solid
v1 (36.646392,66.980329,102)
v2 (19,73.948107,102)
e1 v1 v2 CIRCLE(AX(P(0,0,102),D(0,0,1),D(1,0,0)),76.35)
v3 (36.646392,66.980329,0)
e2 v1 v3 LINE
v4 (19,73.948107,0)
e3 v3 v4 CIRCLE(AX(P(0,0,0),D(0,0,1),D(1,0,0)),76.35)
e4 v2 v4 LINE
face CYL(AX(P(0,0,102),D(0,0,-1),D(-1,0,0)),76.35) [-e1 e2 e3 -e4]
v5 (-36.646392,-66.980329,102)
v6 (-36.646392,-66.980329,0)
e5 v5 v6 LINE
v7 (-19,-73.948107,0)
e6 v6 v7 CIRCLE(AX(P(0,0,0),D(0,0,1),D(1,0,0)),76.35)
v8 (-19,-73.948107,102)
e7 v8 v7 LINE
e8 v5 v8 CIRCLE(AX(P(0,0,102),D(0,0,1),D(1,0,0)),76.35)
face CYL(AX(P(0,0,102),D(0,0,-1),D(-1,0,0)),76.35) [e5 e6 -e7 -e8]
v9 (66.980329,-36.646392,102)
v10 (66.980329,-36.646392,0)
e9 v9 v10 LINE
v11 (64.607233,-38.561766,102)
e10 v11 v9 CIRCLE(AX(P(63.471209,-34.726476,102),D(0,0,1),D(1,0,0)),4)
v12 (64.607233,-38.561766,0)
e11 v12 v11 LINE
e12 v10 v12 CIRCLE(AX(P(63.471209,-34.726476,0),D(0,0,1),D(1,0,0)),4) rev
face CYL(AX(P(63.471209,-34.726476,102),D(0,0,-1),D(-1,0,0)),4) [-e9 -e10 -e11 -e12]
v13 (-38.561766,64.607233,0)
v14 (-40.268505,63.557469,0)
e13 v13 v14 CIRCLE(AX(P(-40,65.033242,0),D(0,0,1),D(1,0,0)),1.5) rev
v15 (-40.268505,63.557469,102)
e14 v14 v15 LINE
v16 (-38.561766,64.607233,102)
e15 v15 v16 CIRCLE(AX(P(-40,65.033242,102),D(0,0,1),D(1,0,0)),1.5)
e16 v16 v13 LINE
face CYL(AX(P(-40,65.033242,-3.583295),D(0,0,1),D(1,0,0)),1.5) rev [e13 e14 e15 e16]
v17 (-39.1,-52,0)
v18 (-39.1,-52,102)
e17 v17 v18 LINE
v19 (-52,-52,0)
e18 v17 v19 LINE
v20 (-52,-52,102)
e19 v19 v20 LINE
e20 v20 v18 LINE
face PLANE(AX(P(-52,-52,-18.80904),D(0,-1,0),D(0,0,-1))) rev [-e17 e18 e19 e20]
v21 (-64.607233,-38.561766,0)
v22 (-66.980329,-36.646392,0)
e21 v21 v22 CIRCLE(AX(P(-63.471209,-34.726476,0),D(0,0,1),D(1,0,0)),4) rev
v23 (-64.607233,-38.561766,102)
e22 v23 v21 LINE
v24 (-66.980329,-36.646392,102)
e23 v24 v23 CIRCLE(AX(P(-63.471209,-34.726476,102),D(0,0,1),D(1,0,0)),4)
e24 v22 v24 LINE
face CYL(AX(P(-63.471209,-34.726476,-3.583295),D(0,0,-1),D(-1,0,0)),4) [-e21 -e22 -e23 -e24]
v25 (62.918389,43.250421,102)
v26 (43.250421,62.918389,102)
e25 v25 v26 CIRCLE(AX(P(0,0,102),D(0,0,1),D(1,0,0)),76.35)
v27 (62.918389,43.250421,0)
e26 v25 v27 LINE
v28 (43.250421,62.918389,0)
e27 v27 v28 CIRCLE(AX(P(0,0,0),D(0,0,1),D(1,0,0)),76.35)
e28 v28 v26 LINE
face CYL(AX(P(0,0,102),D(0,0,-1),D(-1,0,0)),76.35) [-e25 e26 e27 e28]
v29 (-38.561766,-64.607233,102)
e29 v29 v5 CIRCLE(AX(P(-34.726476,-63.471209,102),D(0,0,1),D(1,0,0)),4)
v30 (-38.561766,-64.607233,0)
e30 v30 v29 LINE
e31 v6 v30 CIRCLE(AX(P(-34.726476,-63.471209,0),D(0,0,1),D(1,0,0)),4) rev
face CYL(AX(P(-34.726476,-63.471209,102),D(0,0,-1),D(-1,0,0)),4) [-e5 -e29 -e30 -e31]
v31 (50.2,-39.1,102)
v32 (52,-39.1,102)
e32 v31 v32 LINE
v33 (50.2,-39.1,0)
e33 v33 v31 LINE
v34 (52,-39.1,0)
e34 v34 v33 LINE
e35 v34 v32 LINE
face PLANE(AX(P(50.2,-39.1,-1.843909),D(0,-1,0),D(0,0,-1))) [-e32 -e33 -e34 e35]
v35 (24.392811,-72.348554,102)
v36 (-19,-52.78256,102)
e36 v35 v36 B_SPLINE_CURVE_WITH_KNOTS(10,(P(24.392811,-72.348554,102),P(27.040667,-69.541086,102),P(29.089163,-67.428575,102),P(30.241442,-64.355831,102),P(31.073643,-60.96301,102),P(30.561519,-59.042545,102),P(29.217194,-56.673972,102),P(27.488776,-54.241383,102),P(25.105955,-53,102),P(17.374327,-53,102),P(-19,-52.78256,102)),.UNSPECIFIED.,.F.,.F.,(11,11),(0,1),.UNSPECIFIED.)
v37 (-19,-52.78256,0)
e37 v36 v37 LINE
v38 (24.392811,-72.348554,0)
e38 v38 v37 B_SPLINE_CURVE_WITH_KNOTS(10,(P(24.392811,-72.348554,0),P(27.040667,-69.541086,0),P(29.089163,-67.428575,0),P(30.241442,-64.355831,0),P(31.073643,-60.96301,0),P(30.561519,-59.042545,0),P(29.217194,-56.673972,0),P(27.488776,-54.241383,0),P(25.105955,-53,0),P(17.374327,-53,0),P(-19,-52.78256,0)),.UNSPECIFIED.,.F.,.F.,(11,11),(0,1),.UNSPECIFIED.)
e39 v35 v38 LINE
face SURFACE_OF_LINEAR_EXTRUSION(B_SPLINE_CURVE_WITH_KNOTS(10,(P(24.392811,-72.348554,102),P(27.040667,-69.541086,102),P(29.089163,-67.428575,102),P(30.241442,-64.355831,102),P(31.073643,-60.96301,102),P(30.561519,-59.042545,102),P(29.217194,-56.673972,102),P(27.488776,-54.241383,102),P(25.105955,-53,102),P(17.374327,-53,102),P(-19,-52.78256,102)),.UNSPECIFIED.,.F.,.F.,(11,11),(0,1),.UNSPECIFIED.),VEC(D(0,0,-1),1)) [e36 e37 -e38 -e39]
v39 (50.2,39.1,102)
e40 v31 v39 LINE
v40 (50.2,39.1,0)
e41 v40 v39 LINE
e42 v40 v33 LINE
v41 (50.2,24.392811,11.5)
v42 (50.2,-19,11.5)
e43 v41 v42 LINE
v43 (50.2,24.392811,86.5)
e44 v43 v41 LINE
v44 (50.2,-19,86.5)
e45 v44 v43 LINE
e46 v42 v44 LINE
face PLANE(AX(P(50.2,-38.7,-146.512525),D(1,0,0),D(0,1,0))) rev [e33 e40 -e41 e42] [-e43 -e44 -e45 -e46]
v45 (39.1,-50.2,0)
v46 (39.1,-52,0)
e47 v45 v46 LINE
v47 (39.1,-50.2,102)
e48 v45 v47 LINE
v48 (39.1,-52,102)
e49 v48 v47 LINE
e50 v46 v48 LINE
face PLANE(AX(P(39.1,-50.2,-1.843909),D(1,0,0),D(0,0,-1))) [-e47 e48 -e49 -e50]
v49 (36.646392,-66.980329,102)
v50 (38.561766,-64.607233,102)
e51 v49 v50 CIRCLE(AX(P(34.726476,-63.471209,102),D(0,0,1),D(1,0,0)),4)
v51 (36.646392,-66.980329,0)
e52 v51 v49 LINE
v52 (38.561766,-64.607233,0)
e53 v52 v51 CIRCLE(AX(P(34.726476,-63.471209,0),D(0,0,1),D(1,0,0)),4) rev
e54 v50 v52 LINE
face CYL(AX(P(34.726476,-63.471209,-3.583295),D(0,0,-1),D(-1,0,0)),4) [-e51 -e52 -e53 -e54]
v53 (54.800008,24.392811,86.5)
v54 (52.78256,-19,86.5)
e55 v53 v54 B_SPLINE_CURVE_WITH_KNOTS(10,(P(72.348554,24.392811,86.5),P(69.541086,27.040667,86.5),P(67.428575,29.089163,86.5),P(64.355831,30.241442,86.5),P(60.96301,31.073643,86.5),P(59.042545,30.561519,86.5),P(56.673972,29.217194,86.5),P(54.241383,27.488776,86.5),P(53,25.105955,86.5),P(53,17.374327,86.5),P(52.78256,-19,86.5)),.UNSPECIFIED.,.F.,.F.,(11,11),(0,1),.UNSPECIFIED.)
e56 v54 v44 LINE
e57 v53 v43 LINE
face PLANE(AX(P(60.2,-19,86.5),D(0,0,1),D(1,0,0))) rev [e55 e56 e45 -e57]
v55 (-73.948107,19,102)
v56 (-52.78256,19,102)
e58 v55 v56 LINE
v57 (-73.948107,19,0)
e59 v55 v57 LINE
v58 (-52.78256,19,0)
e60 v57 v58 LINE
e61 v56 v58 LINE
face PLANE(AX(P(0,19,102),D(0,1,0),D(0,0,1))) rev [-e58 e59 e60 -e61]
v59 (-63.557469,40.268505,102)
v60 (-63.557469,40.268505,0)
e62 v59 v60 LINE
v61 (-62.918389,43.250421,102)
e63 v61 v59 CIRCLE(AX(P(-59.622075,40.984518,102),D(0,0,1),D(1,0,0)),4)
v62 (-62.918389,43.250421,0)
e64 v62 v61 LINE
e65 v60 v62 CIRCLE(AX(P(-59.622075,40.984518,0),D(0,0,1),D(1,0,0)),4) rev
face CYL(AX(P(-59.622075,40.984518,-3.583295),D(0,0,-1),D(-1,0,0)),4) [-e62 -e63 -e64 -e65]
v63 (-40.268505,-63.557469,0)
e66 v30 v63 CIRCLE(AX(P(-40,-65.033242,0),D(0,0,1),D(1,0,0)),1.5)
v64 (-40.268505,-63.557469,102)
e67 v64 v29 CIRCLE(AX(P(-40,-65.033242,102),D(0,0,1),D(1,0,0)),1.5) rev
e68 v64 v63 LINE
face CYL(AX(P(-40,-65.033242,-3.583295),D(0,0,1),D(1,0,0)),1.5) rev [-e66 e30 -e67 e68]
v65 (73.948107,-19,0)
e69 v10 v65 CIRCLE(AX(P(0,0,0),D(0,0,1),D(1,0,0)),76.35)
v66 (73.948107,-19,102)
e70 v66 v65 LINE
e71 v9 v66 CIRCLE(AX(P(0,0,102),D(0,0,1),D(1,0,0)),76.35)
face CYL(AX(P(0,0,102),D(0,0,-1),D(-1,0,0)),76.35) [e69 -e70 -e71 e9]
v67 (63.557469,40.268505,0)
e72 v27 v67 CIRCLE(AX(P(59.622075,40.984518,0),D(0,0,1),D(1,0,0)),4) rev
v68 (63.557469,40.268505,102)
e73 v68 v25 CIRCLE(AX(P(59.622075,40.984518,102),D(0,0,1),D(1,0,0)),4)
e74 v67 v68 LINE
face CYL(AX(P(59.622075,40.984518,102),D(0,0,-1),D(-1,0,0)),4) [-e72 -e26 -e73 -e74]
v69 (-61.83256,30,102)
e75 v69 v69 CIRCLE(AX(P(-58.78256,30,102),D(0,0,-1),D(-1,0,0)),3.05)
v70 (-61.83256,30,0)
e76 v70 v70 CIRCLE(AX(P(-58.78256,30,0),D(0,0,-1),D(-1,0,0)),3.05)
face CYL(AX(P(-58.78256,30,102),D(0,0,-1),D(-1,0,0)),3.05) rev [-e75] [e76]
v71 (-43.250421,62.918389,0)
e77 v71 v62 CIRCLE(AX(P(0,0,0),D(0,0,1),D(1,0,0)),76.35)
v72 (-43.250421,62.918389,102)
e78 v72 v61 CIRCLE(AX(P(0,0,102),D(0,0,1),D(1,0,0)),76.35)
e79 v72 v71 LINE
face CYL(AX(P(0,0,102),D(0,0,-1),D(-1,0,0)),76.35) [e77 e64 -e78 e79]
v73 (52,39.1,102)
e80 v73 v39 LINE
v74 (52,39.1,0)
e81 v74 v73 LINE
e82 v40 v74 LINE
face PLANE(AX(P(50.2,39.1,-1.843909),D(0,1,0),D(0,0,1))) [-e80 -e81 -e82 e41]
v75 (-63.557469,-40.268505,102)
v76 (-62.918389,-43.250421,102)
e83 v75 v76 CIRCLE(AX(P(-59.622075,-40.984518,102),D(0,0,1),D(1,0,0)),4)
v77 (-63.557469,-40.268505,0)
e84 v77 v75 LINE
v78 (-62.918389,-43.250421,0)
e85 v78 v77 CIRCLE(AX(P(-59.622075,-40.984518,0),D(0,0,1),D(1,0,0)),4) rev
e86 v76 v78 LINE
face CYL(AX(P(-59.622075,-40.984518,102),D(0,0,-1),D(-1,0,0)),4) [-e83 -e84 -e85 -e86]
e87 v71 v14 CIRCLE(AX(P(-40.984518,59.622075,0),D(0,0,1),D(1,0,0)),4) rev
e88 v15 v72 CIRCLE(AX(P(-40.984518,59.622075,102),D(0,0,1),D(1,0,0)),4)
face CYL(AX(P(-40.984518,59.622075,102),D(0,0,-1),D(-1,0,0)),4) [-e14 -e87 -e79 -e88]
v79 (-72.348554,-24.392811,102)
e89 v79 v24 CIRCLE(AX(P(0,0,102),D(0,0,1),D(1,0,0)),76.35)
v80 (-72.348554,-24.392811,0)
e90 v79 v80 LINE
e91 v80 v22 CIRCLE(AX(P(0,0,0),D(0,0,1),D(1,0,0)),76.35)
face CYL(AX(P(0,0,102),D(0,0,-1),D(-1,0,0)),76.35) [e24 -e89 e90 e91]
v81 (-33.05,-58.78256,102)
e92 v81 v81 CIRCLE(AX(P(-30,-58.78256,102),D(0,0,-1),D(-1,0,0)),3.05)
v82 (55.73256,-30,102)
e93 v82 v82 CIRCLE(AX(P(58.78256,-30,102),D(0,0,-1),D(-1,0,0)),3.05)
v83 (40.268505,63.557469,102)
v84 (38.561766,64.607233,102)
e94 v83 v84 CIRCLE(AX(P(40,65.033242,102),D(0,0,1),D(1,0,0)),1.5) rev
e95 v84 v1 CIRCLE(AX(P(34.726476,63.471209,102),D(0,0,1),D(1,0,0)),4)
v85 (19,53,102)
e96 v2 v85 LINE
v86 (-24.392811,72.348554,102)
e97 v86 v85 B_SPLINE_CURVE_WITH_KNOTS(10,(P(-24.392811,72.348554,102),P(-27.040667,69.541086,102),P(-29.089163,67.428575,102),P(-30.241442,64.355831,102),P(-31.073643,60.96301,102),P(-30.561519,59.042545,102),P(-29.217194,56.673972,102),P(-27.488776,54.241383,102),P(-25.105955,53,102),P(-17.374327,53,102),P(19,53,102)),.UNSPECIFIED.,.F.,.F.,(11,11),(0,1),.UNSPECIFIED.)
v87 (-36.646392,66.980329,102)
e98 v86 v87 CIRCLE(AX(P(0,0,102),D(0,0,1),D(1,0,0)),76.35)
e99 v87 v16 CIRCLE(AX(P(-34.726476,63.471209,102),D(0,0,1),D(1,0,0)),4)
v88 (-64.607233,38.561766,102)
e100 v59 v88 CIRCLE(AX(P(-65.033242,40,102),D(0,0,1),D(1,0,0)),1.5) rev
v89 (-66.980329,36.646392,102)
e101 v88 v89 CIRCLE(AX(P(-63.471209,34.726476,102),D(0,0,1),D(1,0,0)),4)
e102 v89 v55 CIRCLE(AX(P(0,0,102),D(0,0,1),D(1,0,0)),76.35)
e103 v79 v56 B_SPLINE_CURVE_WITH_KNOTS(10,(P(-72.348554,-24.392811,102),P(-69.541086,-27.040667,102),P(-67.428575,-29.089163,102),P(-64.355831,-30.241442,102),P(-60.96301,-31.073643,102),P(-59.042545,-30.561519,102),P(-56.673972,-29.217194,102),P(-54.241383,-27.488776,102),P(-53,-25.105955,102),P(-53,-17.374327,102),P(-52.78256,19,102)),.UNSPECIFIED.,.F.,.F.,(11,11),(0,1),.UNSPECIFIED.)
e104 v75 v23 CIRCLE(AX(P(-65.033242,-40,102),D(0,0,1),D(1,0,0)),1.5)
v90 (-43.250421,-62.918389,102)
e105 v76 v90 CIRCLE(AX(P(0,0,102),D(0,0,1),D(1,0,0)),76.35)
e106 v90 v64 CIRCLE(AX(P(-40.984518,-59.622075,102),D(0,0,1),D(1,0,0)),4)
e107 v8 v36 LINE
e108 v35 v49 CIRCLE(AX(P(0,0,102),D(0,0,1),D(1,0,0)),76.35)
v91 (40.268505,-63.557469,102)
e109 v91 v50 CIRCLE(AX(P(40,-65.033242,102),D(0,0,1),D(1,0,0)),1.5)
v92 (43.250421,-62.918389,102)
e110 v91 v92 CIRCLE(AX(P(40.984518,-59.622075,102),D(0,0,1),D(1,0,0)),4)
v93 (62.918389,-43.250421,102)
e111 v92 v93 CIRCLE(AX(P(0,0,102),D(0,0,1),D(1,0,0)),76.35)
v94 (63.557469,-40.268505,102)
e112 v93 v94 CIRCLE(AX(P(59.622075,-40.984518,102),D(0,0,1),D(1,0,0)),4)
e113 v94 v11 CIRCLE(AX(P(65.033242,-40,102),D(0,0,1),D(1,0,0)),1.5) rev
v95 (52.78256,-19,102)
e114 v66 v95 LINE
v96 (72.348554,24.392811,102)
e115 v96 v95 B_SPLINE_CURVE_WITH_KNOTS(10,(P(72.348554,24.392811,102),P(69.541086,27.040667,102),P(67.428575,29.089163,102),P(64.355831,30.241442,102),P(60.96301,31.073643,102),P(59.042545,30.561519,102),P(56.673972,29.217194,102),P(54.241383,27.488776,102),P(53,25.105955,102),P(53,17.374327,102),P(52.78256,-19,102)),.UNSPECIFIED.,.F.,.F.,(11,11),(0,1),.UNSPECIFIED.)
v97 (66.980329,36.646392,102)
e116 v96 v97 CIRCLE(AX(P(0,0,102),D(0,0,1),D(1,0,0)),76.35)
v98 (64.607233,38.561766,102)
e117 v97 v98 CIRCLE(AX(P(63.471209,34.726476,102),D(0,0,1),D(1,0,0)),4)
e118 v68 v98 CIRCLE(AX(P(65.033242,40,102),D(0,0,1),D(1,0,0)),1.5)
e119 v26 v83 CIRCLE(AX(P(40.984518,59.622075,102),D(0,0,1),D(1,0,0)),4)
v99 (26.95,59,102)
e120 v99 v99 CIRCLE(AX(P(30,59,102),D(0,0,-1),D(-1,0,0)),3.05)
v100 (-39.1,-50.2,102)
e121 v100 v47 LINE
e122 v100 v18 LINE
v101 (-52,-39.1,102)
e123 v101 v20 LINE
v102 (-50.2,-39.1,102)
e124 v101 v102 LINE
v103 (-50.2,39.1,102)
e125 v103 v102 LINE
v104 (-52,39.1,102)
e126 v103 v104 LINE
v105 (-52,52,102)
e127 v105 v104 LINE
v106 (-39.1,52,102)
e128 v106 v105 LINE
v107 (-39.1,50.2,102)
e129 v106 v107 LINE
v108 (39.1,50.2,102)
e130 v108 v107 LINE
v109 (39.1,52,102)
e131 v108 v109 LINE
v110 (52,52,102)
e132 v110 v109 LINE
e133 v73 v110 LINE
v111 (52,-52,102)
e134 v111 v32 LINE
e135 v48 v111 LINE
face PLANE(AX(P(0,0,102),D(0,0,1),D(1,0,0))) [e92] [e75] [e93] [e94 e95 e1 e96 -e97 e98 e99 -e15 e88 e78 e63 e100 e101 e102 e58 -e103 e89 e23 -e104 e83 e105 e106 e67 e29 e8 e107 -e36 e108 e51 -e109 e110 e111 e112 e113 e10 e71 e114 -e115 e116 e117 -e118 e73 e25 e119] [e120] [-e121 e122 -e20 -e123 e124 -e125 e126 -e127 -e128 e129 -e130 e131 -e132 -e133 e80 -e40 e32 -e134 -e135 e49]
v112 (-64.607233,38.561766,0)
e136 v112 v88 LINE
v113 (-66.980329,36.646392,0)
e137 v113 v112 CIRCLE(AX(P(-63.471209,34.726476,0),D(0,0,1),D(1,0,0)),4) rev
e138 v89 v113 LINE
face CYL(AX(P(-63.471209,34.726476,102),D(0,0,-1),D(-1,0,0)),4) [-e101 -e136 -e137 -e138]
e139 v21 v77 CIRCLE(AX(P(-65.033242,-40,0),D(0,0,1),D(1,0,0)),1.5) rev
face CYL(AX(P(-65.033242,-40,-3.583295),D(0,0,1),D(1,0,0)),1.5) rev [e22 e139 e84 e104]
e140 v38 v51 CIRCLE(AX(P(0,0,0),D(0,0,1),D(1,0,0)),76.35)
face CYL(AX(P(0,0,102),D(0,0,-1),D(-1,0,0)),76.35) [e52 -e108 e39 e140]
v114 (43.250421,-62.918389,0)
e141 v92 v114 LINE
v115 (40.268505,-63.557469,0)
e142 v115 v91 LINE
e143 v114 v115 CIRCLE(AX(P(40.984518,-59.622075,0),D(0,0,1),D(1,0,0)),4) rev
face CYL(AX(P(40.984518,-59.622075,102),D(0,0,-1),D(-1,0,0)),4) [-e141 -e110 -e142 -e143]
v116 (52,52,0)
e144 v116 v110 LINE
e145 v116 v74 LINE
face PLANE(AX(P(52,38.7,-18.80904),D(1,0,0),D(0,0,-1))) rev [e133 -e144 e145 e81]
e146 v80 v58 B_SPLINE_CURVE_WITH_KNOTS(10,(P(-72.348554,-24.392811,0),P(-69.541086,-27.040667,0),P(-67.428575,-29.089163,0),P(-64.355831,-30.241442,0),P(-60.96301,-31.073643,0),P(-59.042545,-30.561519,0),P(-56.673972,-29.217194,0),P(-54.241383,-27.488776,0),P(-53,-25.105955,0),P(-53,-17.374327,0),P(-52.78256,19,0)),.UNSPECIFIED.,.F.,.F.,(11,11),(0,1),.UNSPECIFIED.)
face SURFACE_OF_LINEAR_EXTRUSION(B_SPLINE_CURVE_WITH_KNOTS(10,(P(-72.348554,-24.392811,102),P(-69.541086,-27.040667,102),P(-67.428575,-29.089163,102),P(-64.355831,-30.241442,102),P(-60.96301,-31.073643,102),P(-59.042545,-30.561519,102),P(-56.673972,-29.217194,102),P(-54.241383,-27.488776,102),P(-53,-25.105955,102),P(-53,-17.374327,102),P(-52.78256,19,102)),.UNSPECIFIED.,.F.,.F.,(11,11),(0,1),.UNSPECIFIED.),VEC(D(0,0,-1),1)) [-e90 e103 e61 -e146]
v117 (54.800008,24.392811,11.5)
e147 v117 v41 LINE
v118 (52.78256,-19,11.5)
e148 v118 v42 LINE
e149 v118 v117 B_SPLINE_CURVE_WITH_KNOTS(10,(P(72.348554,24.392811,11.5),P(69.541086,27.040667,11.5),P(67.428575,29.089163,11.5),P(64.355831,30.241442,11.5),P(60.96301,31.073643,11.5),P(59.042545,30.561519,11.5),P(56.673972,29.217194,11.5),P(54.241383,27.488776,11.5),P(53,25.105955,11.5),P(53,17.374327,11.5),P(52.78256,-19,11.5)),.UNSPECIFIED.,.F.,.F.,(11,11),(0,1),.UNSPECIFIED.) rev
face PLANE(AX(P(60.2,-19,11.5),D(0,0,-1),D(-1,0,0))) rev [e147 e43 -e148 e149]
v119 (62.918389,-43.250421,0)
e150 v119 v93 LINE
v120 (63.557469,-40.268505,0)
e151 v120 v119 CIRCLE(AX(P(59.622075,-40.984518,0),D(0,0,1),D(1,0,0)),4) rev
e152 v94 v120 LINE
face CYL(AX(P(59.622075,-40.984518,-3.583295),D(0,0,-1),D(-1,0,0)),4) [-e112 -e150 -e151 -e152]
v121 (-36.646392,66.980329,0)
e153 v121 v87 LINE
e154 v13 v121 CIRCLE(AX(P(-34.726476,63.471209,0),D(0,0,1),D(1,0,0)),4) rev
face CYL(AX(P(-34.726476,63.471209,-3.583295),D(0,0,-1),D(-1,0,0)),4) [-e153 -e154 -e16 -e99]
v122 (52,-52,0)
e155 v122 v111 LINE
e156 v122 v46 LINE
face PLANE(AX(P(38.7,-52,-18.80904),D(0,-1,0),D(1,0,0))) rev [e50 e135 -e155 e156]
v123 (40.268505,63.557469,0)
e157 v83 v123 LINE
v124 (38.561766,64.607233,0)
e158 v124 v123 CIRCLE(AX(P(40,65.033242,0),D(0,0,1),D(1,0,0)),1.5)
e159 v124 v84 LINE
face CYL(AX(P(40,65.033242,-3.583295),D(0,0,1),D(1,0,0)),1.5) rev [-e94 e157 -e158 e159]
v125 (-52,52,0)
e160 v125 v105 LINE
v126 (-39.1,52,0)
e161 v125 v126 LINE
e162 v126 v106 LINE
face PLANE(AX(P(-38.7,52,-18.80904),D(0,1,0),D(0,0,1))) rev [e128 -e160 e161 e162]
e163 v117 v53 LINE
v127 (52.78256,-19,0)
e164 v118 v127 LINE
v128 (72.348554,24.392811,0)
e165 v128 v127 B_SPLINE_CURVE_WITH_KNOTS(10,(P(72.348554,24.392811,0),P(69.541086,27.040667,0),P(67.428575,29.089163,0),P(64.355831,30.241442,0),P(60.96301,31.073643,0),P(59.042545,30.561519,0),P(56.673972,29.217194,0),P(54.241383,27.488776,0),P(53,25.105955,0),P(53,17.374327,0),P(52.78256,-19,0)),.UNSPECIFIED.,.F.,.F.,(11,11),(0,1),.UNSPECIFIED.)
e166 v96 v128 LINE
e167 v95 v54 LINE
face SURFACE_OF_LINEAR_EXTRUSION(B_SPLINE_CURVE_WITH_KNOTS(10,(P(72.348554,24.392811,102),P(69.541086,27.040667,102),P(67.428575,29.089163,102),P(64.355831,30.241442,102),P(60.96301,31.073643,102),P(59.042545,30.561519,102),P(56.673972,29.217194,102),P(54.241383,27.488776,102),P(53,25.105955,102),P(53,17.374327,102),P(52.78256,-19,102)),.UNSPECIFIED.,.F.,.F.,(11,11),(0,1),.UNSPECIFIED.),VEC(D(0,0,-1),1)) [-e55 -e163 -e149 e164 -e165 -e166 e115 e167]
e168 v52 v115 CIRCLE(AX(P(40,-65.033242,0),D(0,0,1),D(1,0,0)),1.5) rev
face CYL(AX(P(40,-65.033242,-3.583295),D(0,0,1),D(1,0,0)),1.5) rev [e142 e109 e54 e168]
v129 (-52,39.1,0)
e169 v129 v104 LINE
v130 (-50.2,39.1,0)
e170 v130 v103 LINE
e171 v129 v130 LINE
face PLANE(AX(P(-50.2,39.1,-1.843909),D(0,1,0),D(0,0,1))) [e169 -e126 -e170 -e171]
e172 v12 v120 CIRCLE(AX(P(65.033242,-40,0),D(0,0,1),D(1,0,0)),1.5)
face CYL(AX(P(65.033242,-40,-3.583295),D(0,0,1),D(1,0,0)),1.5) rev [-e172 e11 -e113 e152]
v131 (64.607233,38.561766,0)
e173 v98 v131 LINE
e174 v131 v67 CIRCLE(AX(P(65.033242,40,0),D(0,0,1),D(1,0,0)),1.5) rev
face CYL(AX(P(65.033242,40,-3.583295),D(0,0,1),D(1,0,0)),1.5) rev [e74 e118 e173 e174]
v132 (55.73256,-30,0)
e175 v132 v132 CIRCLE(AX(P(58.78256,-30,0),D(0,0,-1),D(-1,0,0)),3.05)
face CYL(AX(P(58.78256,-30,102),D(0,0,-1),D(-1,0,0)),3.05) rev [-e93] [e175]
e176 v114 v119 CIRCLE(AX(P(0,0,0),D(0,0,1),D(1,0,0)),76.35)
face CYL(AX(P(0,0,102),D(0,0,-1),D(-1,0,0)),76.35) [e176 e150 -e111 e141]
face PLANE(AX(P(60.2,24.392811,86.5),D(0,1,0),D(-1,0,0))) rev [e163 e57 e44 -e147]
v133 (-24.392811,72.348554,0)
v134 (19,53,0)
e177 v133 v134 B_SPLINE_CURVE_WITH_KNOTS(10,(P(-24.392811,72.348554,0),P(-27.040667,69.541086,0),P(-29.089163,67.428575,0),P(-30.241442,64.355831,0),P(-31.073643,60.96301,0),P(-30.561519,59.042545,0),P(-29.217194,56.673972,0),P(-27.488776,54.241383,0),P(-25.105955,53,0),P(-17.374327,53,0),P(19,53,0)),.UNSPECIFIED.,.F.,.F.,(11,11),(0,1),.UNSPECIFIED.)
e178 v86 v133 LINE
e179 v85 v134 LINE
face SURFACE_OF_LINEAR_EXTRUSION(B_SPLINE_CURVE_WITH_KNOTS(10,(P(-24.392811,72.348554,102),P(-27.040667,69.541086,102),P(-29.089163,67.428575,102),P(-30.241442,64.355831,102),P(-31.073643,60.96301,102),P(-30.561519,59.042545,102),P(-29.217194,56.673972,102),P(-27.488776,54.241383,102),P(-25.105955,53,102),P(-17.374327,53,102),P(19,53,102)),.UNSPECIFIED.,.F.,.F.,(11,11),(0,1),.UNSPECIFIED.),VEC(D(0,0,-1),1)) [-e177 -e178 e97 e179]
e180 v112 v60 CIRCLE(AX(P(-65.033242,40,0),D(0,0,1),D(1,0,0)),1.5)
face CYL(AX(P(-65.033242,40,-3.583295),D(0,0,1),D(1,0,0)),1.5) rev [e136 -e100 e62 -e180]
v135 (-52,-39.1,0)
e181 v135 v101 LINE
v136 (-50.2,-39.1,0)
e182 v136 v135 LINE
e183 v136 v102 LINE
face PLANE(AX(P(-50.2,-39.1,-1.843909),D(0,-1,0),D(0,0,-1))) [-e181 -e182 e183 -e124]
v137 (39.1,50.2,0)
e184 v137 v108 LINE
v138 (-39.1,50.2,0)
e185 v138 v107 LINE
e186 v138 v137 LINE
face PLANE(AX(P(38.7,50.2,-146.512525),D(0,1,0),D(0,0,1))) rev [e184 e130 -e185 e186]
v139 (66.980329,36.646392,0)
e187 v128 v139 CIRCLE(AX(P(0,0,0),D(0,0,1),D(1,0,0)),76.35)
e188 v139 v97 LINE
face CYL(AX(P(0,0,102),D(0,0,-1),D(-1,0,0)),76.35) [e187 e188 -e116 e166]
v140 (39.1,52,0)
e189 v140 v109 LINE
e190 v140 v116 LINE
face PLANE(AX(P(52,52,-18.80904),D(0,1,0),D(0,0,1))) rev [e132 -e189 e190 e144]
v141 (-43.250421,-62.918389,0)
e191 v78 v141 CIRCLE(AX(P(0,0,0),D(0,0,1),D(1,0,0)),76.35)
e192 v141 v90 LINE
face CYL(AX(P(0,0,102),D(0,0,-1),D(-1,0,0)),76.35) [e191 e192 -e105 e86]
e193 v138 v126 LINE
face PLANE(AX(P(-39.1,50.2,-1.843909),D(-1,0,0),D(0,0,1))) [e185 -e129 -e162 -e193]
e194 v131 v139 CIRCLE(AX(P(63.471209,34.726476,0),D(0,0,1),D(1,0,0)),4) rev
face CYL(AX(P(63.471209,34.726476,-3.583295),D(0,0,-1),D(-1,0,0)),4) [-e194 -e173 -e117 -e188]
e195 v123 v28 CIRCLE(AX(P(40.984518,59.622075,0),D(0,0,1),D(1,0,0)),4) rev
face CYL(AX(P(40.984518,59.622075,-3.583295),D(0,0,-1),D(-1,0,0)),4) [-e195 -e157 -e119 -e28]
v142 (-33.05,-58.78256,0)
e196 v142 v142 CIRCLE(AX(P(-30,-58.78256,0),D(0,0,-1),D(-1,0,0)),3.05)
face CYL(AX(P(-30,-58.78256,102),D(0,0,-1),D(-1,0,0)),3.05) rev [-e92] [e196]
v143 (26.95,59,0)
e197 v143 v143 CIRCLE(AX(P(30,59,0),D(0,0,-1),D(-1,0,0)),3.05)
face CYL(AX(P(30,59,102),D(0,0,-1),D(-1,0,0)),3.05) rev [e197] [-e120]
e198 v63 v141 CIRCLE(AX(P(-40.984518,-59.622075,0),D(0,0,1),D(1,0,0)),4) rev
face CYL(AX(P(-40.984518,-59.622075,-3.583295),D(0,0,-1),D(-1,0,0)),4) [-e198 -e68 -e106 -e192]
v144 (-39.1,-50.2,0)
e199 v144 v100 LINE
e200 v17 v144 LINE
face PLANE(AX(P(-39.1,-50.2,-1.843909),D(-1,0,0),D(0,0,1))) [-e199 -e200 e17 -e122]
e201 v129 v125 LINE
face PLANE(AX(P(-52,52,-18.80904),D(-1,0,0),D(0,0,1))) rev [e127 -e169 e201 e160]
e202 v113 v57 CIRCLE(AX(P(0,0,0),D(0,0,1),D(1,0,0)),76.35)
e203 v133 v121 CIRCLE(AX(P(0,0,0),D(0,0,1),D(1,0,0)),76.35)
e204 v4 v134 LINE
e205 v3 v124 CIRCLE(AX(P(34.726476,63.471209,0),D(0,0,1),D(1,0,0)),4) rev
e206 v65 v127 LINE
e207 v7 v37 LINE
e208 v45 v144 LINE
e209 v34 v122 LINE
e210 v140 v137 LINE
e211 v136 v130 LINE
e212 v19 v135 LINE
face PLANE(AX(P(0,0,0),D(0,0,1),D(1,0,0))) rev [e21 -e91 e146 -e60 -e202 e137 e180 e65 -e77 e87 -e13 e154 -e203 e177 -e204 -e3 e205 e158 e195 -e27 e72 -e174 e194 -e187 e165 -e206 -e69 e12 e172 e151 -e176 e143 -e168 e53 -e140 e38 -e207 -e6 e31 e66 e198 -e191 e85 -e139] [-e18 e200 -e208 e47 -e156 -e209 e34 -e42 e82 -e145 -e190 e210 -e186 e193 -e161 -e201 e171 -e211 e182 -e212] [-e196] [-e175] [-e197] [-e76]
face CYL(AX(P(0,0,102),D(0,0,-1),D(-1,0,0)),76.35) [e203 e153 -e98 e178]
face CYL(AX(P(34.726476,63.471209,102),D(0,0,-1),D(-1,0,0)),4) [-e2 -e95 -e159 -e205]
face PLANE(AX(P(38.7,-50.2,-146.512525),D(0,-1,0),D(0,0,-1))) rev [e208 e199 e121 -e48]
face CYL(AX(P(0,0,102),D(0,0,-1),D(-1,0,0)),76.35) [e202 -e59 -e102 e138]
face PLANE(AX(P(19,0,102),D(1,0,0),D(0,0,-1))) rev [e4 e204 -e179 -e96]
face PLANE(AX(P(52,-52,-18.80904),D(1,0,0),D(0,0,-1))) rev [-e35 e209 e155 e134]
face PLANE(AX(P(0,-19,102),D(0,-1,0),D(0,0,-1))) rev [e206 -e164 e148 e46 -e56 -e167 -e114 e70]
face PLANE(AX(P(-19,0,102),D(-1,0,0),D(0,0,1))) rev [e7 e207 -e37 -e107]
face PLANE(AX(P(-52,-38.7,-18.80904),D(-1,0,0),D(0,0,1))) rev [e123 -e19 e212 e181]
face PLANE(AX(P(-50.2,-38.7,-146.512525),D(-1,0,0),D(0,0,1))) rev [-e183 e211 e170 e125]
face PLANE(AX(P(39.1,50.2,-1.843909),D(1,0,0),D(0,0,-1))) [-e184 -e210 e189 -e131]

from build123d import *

# Parameters (mm, degrees)
BOSS_EXTRUDE3_OUTLINE_R = 3
BOSS_EXTRUDE3_DEPTH     = 102
CUT_EXTRUDE1_DEPTH      = 102
CUT_EXTRUDE2_DEPTH      = 102
SKETCH4_W               = 0.4
SKETCH4_H               = 1.8
SKETCH4_W_2             = 1.8
SKETCH4_H_2             = 0.4
BOSS_EXTRUDE4_DEPTH     = 102
SKETCH5_W               = 75
SKETCH5_H               = 43.392810524
CUT_EXTRUDE6_DEPTH      = 10
SKETCH7_R               = 3.05
CUT_EXTRUDE9_DEPTH      = 147.084376475
CUT_EXTRUDE8_START      = -102
CUT_EXTRUDE8_DEPTH      = 102
FILLET1_R               = 4


# Read off the part's stored shape, not the designer's step: Boss-Extrude3
with BuildPart() as part:
    # Boss-Extrude3 outline → Boss-Extrude3 (new body)
    with BuildSketch(Plane.XY):
        with BuildLine():
            add(Edge.make_bspline(
                [(24.392810524, -72.348554199), (27.040667073, -69.541086329), (29.089162938, -67.428574969), (30.241441862, -64.355831171), (31.073643307, -60.963009895), (30.561519341, -59.042545022), (29.217193929, -56.673971678), (27.488775543, -54.241382838), (25.105954954, -53), (17.37432721, -53), (-19, -52.782560411)],
                knots=[0, 0, 0, 0, 0, 0, 0, 0, 0, 0, 0, 1, 1, 1, 1, 1, 1, 1, 1, 1, 1, 1], degree=10))
            ThreePointArc((24.392810524, -72.348554199), (55.939709188, -51.962211615), (73.948106805, -19))
            Line((73.948106805, -19), (52.782560411, -19))
            add(Edge.make_bspline(
                [(72.348554199, 24.392810524), (69.541086329, 27.040667073), (67.428574969, 29.089162938), (64.355831171, 30.241441862), (60.963009895, 31.073643307), (59.042545022, 30.561519341), (56.673971678, 29.217193929), (54.241382838, 27.488775543), (53, 25.105954954), (53, 17.37432721), (52.782560411, -19)],
                knots=[0, 0, 0, 0, 0, 0, 0, 0, 0, 0, 0, 1, 1, 1, 1, 1, 1, 1, 1, 1, 1, 1], degree=10))
            ThreePointArc((72.348554199, 24.392810524), (51.962211615, 55.939709188), (19, 73.948106805))
            Line((19, 73.948106805), (19, 53))
            add(Edge.make_bspline(
                [(-24.392810524, 72.348554199), (-27.040667073, 69.541086329), (-29.089162938, 67.428574969), (-30.241441862, 64.355831171), (-31.073643307, 60.963009895), (-30.561519341, 59.042545022), (-29.217193929, 56.673971678), (-27.488775543, 54.241382838), (-25.105954954, 53), (-17.37432721, 53), (19, 53)],
                knots=[0, 0, 0, 0, 0, 0, 0, 0, 0, 0, 0, 1, 1, 1, 1, 1, 1, 1, 1, 1, 1, 1], degree=10))
            ThreePointArc((-24.392810524, 72.348554199), (-55.939709188, 51.962211615), (-73.948106805, 19))
            Line((-73.948106805, 19), (-52.782560411, 19))
            add(Edge.make_bspline(
                [(-72.348554199, -24.392810524), (-69.541086329, -27.040667073), (-67.428574969, -29.089162938), (-64.355831171, -30.241441862), (-60.963009895, -31.073643307), (-59.042545022, -30.561519341), (-56.673971678, -29.217193929), (-54.241382838, -27.488775543), (-53, -25.105954954), (-53, -17.37432721), (-52.782560411, 19)],
                knots=[0, 0, 0, 0, 0, 0, 0, 0, 0, 0, 0, 1, 1, 1, 1, 1, 1, 1, 1, 1, 1, 1], degree=10))
            ThreePointArc((-72.348554199, -24.392810524), (-51.962211615, -55.939709188), (-19, -73.948106805))
            Line((-19, -73.948106805), (-19, -52.782560411))
        make_face()
        with Locations((-30, -58.782560411)):
            Circle(BOSS_EXTRUDE3_OUTLINE_R, mode=Mode.SUBTRACT)
        with Locations((58.782560411, -30)):
            Circle(BOSS_EXTRUDE3_OUTLINE_R, mode=Mode.SUBTRACT)
        with Locations((-58.782560411, 30)):
            Circle(BOSS_EXTRUDE3_OUTLINE_R, mode=Mode.SUBTRACT)
        Polygon((-38.9, -51.6), (-51.6, -51.6), (-51.6, -38.9), (-50, -38.9), (-50, 38.9), (-51.6, 38.9), (-51.6, 51.6), (-38.9, 51.6), (-38.9, 50), (38.9, 50), (38.9, 51.6), (51.6, 51.6), (51.6, 38.9), (50, 38.9), (50, -38.9), (51.6, -38.9), (51.6, -51.6), (38.9, -51.6), (38.9, -50), (-38.9, -50), align=None, mode=Mode.SUBTRACT)
        with Locations((30, 59)):
            Circle(BOSS_EXTRUDE3_OUTLINE_R, mode=Mode.SUBTRACT)
    extrude(amount=BOSS_EXTRUDE3_DEPTH)

    # Sketch2 → Cut-Extrude1 (cut)
    with BuildSketch(Plane.XY.offset(102)):
        Polygon((51.8, -38.7), (50.2, -38.7), (50.2, 38.7), (51.8, 38.7), (51.8, 51.8), (38.7, 51.8), (38.7, 50.2), (-38.7, 50.2), (-38.7, 51.8), (-51.8, 51.8), (-51.8, 38.7), (-50.2, 38.7), (-50.2, -38.7), (-51.8, -38.7), (-51.8, -51.8), (-38.7, -51.8), (-38.7, -50.2), (38.7, -50.2), (38.7, -51.8), (51.8, -51.8), align=None)
        Polygon((51.6, -38.9), (50, -38.9), (50, 38.9), (51.6, 38.9), (51.6, 51.6), (38.9, 51.6), (38.9, 50), (-38.9, 50), (-38.9, 51.6), (-51.6, 51.6), (-51.6, 38.9), (-50, 38.9), (-50, -38.9), (-51.6, -38.9), (-51.6, -51.6), (-38.9, -51.6), (-38.9, -50), (38.9, -50), (38.9, -51.6), (51.6, -51.6), align=None, mode=Mode.SUBTRACT)
    extrude(amount=-CUT_EXTRUDE1_DEPTH, mode=Mode.SUBTRACT)

    # Sketch3 → Cut-Extrude2 (cut)
    with BuildSketch(Plane.XY.offset(102)):
        Polygon((-51.8, -51.8), (-38.7, -51.8), (-38.7, -52), (-52, -52), (-52, -38.7), (-51.8, -38.7), align=None)
        Polygon((38.7, -51.8), (51.8, -51.8), (51.8, -38.7), (52, -38.7), (52, -52), (38.7, -52), align=None)
        Polygon((51.8, 38.7), (51.8, 51.8), (38.7, 51.8), (38.7, 52), (52, 52), (52, 38.7), align=None)
        Polygon((-51.8, 51.8), (-51.8, 38.7), (-52, 38.7), (-52, 52), (-38.7, 52), (-38.7, 51.8), align=None)
    extrude(amount=-CUT_EXTRUDE2_DEPTH, mode=Mode.SUBTRACT)

    # Sketch4 → Boss-Extrude4 (add)
    with BuildSketch(Plane.XY.offset(102)):
        with Locations((-38.9, 51.1)):
            Rectangle(SKETCH4_W, SKETCH4_H)
        with Locations((-51.1, 38.9)):
            Rectangle(SKETCH4_W_2, SKETCH4_H_2)
        with Locations((38.9, 51.1)):
            Rectangle(SKETCH4_W, SKETCH4_H)
        with Locations((51.1, 38.9)):
            Rectangle(SKETCH4_W_2, SKETCH4_H_2)
        with Locations((38.9, -51.1)):
            Rectangle(SKETCH4_W, SKETCH4_H)
        with Locations((51.1, -38.9)):
            Rectangle(SKETCH4_W_2, SKETCH4_H_2)
        with Locations((-51.1, -38.9)):
            Rectangle(SKETCH4_W_2, SKETCH4_H_2)
        with Locations((-38.9, -51.1)):
            Rectangle(SKETCH4_W, SKETCH4_H)
    extrude(amount=-BOSS_EXTRUDE4_DEPTH)

    # Sketch5 → Cut-Extrude6 (cut)
    with BuildSketch(Plane.ZY.offset(-50.2)):
        with Locations((49, 2.696405262)):
            Rectangle(SKETCH5_W, SKETCH5_H)
    extrude(amount=-CUT_EXTRUDE6_DEPTH, mode=Mode.SUBTRACT)

    # Sketch7 → Cut-Extrude9 (cut, through all)
    with BuildSketch(Plane(origin=(0, 0, 0), x_dir=(-1, 0, 0), z_dir=(0, 0, -1))):
        with Locations((30, -58.782560411)):
            Circle(SKETCH7_R)
        with Locations((-58.782560411, -30)):
            Circle(SKETCH7_R)
        with Locations((58.782560411, 30)):
            Circle(SKETCH7_R)
        with Locations((-30, 59)):
            Circle(SKETCH7_R)
    extrude(amount=-CUT_EXTRUDE9_DEPTH, mode=Mode.SUBTRACT)

    # Sketch6 → Cut-Extrude8 (cut)
    with BuildSketch(Plane.XY.offset(102).offset(CUT_EXTRUDE8_START)):
        with BuildLine():
            ThreePointArc((-65.806507446, 38.714675225), (-63.755574673, 39.214145383), (-64.234874045, 41.269885588))
            ThreePointArc((-64.234874045, 41.269885588), (-65.0332415, 40), (-65.806507446, 38.714675225))
        make_face()
        with BuildLine():
            ThreePointArc((-38.714675225, 65.806507446), (-40, 65.0332415), (-41.269885588, 64.234874045))
            ThreePointArc((-41.269885588, 64.234874045), (-39.214145383, 63.755574673), (-38.714675225, 65.806507446))
        make_face()
        with BuildLine():
            ThreePointArc((41.269885588, 64.234874045), (40, 65.0332415), (38.714675225, 65.806507446))
            ThreePointArc((38.714675225, 65.806507446), (39.214145383, 63.755574673), (41.269885588, 64.234874045))
        make_face()
        with BuildLine():
            ThreePointArc((65.806507446, 38.714675225), (65.0332415, 40), (64.234874045, 41.269885588))
            ThreePointArc((64.234874045, 41.269885588), (63.755574673, 39.214145383), (65.806507446, 38.714675225))
        make_face()
        with BuildLine():
            ThreePointArc((65.806507446, -38.714675225), (63.755574673, -39.214145383), (64.234874045, -41.269885588))
            ThreePointArc((64.234874045, -41.269885588), (65.0332415, -40), (65.806507446, -38.714675225))
        make_face()
        with BuildLine():
            ThreePointArc((38.714675225, -65.806507446), (40, -65.0332415), (41.269885588, -64.234874045))
            ThreePointArc((41.269885588, -64.234874045), (39.214145383, -63.755574673), (38.714675225, -65.806507446))
        make_face()
        with BuildLine():
            ThreePointArc((-38.714675225, -65.806507446), (-39.214145383, -63.755574673), (-41.269885588, -64.234874045))
            ThreePointArc((-41.269885588, -64.234874045), (-40, -65.0332415), (-38.714675225, -65.806507446))
        make_face()
        with BuildLine():
            ThreePointArc((-65.806507446, -38.714675225), (-65.0332415, -40), (-64.234874045, -41.269885588))
            ThreePointArc((-64.234874045, -41.269885588), (-63.755574673, -39.214145383), (-65.806507446, -38.714675225))
        make_face()
    extrude(amount=CUT_EXTRUDE8_DEPTH, mode=Mode.SUBTRACT)

    # Fillet1
    fillet1_edges = [part.edges().sort_by_distance(p)[0] for p in [
        (-41.269885588, 64.234874045, 51),
        (-38.714675225, 65.806507446, 51),
        (41.269885588, 64.234874045, 51),
        (38.714675225, 65.806507446, 51),
        (64.234874045, 41.269885588, 51),
        (65.806507446, 38.714675225, 51),
        (64.234874045, -41.269885588, 51),
        (65.806507446, -38.714675225, 51),
        (41.269885588, -64.234874045, 51),
        (38.714675225, -65.806507446, 51),
        (-41.269885588, -64.234874045, 51),
        (-38.714675225, -65.806507446, 51),
        (-64.234874045, -41.269885588, 51),
        (-65.806507446, -38.714675225, 51),
        (-64.234874045, 41.269885588, 51),
        (-65.806507446, 38.714675225, 51),
    ]]
    fillet(fillet1_edges, radius=FILLET1_R)


solid = part.part
